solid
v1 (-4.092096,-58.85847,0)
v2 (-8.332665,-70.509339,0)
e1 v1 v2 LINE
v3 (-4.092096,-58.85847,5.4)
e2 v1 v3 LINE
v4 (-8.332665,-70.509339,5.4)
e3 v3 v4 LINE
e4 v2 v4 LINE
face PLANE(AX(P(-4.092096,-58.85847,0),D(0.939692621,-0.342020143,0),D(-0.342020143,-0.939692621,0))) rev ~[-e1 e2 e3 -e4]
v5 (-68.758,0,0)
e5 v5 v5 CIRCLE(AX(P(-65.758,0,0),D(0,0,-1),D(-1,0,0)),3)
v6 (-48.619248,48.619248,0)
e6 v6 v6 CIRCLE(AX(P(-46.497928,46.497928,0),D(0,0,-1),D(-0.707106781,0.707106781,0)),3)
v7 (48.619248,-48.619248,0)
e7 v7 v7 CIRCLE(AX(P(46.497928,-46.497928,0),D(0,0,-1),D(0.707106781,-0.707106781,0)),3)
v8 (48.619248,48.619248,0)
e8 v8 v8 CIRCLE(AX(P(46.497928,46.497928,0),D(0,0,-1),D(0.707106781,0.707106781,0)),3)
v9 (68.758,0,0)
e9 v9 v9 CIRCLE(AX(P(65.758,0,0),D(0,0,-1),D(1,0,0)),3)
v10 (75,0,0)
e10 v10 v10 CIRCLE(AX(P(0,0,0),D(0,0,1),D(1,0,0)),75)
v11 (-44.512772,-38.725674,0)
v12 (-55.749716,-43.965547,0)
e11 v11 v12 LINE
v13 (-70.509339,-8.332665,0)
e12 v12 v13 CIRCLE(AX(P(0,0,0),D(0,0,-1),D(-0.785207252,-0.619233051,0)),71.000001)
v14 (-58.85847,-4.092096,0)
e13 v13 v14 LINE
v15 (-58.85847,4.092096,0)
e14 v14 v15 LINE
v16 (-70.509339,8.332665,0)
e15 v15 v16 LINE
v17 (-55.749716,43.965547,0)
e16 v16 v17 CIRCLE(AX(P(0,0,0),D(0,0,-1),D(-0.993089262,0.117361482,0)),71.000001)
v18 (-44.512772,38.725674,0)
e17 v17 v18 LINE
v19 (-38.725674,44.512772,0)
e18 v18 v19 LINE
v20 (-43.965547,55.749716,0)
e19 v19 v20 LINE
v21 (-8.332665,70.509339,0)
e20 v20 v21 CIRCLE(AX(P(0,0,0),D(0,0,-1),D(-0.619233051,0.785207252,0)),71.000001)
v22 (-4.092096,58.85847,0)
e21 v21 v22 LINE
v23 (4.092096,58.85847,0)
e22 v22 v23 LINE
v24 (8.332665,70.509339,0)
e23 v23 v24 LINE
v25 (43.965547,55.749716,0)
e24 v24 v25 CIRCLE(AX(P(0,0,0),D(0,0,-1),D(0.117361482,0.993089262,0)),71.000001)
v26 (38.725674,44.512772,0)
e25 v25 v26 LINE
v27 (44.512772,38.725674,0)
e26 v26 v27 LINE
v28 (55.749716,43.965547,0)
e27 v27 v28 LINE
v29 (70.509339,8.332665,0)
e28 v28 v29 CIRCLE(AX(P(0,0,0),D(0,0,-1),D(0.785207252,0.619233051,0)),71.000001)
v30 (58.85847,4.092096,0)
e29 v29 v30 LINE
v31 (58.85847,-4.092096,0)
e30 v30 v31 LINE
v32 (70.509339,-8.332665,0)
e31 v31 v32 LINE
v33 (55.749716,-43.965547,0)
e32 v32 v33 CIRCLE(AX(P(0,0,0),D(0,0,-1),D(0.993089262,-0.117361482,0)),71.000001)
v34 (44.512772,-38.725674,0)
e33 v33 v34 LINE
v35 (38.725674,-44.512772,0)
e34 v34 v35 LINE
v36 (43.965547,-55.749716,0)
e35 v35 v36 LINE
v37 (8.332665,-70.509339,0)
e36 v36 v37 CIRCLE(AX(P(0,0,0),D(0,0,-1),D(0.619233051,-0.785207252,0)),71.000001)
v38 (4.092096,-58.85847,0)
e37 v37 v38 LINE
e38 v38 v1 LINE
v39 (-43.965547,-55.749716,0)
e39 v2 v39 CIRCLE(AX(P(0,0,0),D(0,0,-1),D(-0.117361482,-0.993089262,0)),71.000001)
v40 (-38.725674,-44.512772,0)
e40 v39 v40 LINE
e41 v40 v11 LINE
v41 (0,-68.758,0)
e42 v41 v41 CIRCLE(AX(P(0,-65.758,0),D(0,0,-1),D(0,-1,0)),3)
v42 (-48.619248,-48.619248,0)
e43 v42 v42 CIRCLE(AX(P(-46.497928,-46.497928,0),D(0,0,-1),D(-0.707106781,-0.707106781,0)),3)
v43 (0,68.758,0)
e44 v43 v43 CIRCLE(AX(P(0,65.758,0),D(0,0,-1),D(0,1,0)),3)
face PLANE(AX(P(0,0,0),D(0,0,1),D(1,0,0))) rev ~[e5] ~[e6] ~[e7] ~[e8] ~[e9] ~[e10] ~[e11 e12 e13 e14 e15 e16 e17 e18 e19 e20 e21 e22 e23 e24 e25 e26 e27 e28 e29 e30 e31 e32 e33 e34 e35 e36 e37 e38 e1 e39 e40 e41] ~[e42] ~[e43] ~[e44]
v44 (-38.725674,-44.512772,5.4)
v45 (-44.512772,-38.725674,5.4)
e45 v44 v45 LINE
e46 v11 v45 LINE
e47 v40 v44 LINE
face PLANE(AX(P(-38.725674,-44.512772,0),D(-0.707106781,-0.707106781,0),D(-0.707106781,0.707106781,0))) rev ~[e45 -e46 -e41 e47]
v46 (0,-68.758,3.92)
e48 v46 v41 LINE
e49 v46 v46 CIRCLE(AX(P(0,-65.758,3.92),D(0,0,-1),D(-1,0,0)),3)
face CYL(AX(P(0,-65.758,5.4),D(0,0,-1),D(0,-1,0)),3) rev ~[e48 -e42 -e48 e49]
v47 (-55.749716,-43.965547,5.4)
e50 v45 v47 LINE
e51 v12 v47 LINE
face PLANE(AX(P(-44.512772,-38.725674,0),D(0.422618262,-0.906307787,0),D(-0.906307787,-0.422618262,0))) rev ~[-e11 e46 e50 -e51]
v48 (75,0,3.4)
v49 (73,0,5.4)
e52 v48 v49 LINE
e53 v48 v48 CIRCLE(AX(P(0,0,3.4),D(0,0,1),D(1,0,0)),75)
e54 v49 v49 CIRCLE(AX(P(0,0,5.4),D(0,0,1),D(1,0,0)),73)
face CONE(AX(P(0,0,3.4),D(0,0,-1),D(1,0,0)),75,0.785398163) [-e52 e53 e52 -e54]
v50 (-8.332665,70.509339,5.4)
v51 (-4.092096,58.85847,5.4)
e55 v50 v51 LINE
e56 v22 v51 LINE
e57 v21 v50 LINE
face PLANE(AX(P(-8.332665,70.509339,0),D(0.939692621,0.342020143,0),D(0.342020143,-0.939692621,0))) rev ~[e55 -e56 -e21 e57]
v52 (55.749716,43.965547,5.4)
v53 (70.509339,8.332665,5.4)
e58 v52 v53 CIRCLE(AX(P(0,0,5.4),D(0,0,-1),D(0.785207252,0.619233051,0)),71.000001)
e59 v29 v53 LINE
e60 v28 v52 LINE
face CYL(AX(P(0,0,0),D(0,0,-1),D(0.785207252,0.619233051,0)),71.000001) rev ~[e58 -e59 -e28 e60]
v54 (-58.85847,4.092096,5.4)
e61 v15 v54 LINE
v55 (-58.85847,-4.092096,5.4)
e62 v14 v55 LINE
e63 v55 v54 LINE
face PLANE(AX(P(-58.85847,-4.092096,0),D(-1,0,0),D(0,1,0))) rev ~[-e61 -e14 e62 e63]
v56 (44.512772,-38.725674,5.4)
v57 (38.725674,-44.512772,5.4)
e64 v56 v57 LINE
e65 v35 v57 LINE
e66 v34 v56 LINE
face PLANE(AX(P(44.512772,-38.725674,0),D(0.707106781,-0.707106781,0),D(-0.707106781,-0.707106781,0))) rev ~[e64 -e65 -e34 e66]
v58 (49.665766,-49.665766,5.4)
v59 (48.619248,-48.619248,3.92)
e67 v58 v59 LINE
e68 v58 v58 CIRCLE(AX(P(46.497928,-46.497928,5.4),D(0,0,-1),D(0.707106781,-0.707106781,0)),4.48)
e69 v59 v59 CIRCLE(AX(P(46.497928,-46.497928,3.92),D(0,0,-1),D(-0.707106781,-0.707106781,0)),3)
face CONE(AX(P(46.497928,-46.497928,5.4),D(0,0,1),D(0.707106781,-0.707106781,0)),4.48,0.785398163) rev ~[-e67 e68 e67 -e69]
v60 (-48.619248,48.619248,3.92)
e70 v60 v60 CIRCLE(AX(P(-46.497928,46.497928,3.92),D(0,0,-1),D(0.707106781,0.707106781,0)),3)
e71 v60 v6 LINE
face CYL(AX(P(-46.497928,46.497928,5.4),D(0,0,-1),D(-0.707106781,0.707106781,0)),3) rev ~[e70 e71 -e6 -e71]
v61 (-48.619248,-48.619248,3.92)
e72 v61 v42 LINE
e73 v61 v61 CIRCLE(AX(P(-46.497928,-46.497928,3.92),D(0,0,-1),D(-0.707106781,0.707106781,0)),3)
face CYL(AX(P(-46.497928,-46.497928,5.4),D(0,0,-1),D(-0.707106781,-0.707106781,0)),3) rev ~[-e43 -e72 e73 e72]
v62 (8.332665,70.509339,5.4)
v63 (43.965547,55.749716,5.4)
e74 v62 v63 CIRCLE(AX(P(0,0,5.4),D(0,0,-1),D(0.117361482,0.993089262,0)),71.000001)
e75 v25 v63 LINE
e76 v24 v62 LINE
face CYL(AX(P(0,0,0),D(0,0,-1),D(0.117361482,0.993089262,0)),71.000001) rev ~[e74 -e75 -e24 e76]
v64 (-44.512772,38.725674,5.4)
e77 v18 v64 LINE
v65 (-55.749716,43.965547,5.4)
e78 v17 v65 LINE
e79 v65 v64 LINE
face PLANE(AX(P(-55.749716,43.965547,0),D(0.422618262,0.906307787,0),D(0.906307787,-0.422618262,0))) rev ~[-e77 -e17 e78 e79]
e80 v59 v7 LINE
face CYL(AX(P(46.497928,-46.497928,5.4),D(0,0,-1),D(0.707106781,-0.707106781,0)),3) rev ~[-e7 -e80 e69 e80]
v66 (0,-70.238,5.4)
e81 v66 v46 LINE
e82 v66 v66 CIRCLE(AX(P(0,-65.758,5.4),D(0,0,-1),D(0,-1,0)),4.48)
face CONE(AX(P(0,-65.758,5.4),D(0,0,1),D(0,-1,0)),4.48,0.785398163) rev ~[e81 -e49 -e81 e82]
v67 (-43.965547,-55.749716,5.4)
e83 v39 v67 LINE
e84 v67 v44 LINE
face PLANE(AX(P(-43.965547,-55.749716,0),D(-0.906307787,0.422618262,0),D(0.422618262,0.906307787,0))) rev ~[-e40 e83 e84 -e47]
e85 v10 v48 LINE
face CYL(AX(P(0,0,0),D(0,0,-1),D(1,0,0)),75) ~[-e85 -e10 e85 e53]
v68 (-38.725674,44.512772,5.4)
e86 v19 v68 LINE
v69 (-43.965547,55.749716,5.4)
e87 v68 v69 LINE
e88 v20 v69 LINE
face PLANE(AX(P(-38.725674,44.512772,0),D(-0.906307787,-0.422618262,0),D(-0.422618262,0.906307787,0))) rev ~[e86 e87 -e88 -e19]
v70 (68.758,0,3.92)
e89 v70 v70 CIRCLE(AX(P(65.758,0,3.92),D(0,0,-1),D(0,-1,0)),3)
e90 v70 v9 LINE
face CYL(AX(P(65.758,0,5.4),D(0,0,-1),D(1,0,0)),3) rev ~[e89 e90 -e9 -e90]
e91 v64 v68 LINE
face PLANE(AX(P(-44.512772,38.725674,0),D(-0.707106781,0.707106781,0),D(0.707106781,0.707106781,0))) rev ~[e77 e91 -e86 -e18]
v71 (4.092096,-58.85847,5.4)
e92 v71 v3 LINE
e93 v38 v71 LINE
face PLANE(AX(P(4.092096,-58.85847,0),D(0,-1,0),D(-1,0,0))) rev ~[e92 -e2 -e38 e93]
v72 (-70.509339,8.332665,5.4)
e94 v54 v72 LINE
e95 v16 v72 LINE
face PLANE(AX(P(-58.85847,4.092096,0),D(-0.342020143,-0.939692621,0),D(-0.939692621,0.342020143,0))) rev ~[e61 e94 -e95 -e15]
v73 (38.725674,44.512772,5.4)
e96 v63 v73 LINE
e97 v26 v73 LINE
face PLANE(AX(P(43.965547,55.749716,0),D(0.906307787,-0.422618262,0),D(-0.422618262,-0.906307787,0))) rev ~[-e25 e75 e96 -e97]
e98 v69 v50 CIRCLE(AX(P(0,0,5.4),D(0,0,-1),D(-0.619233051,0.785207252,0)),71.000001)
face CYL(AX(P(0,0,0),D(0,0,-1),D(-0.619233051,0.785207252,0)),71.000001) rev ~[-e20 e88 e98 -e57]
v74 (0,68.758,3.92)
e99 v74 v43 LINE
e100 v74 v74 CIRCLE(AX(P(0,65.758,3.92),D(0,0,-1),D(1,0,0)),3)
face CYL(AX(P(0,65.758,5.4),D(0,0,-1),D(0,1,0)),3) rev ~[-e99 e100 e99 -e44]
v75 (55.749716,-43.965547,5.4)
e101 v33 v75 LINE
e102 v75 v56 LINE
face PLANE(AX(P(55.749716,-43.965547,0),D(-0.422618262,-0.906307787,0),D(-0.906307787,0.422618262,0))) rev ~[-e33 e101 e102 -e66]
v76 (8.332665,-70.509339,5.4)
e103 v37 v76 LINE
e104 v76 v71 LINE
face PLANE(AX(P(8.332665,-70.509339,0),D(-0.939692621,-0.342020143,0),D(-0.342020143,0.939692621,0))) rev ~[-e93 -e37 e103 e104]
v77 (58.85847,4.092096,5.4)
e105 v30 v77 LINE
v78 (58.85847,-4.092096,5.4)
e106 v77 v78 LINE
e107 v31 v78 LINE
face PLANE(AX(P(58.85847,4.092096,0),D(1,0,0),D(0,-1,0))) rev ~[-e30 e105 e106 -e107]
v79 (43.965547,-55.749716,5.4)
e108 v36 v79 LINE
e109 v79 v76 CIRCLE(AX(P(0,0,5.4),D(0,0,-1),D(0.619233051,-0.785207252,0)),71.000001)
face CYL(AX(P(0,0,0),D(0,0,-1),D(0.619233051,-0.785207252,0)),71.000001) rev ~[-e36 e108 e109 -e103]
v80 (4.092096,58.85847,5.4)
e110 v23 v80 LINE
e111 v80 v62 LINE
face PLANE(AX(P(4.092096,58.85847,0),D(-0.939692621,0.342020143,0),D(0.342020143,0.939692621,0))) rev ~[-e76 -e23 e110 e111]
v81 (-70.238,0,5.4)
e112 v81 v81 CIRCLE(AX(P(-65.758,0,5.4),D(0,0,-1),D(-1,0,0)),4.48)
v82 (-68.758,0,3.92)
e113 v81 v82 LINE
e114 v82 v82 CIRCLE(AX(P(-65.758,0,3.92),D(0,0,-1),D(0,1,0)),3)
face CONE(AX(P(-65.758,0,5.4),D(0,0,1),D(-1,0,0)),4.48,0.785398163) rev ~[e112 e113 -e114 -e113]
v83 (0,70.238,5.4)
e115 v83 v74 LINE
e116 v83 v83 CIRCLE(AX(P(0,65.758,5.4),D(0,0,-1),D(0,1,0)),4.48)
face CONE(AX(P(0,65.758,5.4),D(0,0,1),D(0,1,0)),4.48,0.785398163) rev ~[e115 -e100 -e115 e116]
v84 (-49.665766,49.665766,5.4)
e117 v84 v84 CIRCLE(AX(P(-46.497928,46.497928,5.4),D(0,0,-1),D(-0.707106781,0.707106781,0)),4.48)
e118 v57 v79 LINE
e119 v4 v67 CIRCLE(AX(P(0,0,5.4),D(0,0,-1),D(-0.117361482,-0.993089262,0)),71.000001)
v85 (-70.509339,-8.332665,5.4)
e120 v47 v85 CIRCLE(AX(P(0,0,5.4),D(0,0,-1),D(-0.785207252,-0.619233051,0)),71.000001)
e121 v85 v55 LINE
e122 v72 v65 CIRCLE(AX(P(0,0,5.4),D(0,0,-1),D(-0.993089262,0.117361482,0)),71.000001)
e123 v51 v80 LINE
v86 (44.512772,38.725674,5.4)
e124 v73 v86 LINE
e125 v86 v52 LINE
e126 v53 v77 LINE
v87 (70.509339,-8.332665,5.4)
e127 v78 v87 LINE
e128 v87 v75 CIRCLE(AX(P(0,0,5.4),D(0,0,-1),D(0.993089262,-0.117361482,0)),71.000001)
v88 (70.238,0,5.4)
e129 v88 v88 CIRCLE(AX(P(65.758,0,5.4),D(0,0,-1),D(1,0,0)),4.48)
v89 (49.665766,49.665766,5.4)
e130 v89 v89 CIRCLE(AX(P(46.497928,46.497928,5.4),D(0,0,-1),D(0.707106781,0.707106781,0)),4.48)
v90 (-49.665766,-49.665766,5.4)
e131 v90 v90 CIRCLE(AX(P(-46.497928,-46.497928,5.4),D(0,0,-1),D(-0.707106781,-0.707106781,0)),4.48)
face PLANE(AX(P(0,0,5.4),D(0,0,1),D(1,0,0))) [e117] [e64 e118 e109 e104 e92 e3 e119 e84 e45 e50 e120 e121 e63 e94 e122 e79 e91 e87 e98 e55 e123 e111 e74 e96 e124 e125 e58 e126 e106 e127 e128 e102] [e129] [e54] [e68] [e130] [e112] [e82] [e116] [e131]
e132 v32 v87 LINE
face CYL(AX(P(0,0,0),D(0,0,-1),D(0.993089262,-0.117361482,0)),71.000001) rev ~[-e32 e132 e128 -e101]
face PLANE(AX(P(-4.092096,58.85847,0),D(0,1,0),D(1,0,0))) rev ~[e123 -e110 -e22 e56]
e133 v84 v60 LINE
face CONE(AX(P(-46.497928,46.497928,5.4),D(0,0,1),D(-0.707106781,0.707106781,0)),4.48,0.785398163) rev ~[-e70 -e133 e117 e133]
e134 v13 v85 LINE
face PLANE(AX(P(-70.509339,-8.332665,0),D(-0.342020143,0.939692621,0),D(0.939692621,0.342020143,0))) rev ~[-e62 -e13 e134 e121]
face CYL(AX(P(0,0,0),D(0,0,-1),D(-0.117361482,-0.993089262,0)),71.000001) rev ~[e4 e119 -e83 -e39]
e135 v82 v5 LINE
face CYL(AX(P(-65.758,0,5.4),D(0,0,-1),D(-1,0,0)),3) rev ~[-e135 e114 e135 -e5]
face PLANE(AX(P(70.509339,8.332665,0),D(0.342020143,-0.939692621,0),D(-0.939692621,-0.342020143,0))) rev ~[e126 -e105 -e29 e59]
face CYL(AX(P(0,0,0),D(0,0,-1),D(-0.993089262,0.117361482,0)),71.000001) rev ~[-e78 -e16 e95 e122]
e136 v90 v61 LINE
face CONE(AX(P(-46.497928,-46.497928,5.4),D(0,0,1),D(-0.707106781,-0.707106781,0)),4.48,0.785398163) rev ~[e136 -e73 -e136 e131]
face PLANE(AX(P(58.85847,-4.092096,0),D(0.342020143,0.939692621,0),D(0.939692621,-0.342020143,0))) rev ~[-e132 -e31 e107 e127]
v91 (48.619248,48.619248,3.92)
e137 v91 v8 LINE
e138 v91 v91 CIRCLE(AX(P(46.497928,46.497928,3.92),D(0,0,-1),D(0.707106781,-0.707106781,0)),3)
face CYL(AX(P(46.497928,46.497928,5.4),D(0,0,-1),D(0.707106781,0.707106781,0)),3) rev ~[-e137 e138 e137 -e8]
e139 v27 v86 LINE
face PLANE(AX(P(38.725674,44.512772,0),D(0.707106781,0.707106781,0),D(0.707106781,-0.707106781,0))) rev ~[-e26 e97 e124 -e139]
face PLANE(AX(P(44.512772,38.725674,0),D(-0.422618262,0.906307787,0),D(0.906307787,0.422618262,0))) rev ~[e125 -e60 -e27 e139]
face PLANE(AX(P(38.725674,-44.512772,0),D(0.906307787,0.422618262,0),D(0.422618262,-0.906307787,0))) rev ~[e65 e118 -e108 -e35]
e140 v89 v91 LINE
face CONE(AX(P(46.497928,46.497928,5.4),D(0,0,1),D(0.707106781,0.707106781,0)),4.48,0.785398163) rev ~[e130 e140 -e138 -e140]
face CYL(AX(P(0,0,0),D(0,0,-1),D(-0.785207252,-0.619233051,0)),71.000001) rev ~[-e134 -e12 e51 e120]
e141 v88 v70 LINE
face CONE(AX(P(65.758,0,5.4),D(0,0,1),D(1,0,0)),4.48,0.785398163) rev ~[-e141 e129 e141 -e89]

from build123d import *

# Parameters (mm, degrees)
F0_R            = 75
F1_DEPTH        = 5.4
F3_D            = 6
F3_DEPTH        = 6
F3_CSINK_D      = 8.96
F3_CSINK_ANGLE  = 90
F3_TIP          = 1.8025818571
F3_COPIES_COUNT = 8
F4_SIZE         = 2


# Not quite as in the source:
# - a pattern or mirror of a feature is missing from the dataset's text; its kind, count and spacing are read off the source's solid


with BuildPart() as f1:
    # F0 (on Top) → F1 (new body)
    with BuildSketch(Plane.XY):
        Circle(F0_R)
        with BuildLine():
            ThreePointArc((-70.5093388309, 8.3326654013), (-65.5954479473, 27.1705241697), (-55.749715835, 43.9655474137))
            Line((-55.749715835, 43.9655474137), (-44.5127719526, 38.7256744271))
            Line((-44.5127719526, 38.7256744271), (-38.7256744271, 44.5127719526))
            Line((-38.7256744271, 44.5127719526), (-43.9655474137, 55.749715835))
            ThreePointArc((-43.9655474137, 55.749715835), (-27.1705241697, 65.5954479473), (-8.3326654013, 70.5093388309))
            Line((-8.3326654013, 70.5093388309), (-4.0920959037, 58.8584698905))
            Line((-4.0920959037, 58.8584698905), (4.0920959037, 58.8584698905))
            Line((4.0920959037, 58.8584698905), (8.3326654013, 70.5093388309))
            ThreePointArc((8.3326654013, 70.5093388309), (27.1705241697, 65.5954479473), (43.9655474137, 55.749715835))
            Line((43.9655474137, 55.749715835), (38.7256744271, 44.5127719526))
            Line((38.7256744271, 44.5127719526), (44.5127719526, 38.7256744271))
            Line((44.5127719526, 38.7256744271), (55.749715835, 43.9655474137))
            ThreePointArc((55.749715835, 43.9655474137), (65.5954479473, 27.1705241697), (70.5093388309, 8.3326654013))
            Line((70.5093388309, 8.3326654013), (58.8584698905, 4.0920959037))
            Line((58.8584698905, 4.0920959037), (58.8584698905, -4.0920959037))
            Line((58.8584698905, -4.0920959037), (70.5093388309, -8.3326654013))
            ThreePointArc((70.5093388309, -8.3326654013), (65.5954479473, -27.1705241697), (55.749715835, -43.9655474137))
            Line((55.749715835, -43.9655474137), (44.5127719526, -38.7256744271))
            Line((44.5127719526, -38.7256744271), (38.7256744271, -44.5127719526))
            Line((38.7256744271, -44.5127719526), (43.9655474137, -55.749715835))
            ThreePointArc((43.9655474137, -55.749715835), (27.1705241697, -65.5954479473), (8.3326654013, -70.5093388309))
            Line((8.3326654013, -70.5093388309), (4.0920959037, -58.8584698905))
            Line((4.0920959037, -58.8584698905), (-4.0920959037, -58.8584698905))
            Line((-4.0920959037, -58.8584698905), (-8.3326654013, -70.5093388309))
            ThreePointArc((-8.3326654013, -70.5093388309), (-27.1705241697, -65.5954479473), (-43.9655474137, -55.749715835))
            Line((-43.9655474137, -55.749715835), (-38.7256744271, -44.5127719526))
            Line((-38.7256744271, -44.5127719526), (-44.5127719526, -38.7256744271))
            Line((-44.5127719526, -38.7256744271), (-55.749715835, -43.9655474137))
            ThreePointArc((-55.749715835, -43.9655474137), (-65.5954479473, -27.1705241697), (-70.5093388309, -8.3326654013))
            Line((-70.5093388309, -8.3326654013), (-58.8584698905, -4.0920959037))
            Line((-58.8584698905, -4.0920959037), (-58.8584698905, 4.0920959037))
            Line((-58.8584698905, 4.0920959037), (-70.5093388309, 8.3326654013))
        make_face(mode=Mode.SUBTRACT)
    extrude(amount=F1_DEPTH)

    # F3
    with Locations(Plane.XY.offset(5.4)):
        with Locations((-65.758, 0)):
            f3 = CounterSinkHole(F3_D / 2, F3_CSINK_D / 2, depth=F3_DEPTH, counter_sink_angle=F3_CSINK_ANGLE)
            with Locations((0, 0, -(F3_DEPTH + F3_TIP / 2))):  # 118° drill point
                Cone(0, F3_D / 2, F3_TIP, mode=Mode.SUBTRACT)

    # F3_copies: F3 ×8 about axis
    f3_copies_axis = Axis((0, 0, 0), (0, 0, 1))
    for i in range(1, F3_COPIES_COUNT):
        add(f3.rotate(f3_copies_axis, i * 360 / F3_COPIES_COUNT), mode=Mode.SUBTRACT)

    # F4
    f4_edges = [f1.edges().sort_by_distance(p)[0] for p in [
        (-75, 0, 5.4),
    ]]
    chamfer(f4_edges, length=F4_SIZE)


solid = f1.part
